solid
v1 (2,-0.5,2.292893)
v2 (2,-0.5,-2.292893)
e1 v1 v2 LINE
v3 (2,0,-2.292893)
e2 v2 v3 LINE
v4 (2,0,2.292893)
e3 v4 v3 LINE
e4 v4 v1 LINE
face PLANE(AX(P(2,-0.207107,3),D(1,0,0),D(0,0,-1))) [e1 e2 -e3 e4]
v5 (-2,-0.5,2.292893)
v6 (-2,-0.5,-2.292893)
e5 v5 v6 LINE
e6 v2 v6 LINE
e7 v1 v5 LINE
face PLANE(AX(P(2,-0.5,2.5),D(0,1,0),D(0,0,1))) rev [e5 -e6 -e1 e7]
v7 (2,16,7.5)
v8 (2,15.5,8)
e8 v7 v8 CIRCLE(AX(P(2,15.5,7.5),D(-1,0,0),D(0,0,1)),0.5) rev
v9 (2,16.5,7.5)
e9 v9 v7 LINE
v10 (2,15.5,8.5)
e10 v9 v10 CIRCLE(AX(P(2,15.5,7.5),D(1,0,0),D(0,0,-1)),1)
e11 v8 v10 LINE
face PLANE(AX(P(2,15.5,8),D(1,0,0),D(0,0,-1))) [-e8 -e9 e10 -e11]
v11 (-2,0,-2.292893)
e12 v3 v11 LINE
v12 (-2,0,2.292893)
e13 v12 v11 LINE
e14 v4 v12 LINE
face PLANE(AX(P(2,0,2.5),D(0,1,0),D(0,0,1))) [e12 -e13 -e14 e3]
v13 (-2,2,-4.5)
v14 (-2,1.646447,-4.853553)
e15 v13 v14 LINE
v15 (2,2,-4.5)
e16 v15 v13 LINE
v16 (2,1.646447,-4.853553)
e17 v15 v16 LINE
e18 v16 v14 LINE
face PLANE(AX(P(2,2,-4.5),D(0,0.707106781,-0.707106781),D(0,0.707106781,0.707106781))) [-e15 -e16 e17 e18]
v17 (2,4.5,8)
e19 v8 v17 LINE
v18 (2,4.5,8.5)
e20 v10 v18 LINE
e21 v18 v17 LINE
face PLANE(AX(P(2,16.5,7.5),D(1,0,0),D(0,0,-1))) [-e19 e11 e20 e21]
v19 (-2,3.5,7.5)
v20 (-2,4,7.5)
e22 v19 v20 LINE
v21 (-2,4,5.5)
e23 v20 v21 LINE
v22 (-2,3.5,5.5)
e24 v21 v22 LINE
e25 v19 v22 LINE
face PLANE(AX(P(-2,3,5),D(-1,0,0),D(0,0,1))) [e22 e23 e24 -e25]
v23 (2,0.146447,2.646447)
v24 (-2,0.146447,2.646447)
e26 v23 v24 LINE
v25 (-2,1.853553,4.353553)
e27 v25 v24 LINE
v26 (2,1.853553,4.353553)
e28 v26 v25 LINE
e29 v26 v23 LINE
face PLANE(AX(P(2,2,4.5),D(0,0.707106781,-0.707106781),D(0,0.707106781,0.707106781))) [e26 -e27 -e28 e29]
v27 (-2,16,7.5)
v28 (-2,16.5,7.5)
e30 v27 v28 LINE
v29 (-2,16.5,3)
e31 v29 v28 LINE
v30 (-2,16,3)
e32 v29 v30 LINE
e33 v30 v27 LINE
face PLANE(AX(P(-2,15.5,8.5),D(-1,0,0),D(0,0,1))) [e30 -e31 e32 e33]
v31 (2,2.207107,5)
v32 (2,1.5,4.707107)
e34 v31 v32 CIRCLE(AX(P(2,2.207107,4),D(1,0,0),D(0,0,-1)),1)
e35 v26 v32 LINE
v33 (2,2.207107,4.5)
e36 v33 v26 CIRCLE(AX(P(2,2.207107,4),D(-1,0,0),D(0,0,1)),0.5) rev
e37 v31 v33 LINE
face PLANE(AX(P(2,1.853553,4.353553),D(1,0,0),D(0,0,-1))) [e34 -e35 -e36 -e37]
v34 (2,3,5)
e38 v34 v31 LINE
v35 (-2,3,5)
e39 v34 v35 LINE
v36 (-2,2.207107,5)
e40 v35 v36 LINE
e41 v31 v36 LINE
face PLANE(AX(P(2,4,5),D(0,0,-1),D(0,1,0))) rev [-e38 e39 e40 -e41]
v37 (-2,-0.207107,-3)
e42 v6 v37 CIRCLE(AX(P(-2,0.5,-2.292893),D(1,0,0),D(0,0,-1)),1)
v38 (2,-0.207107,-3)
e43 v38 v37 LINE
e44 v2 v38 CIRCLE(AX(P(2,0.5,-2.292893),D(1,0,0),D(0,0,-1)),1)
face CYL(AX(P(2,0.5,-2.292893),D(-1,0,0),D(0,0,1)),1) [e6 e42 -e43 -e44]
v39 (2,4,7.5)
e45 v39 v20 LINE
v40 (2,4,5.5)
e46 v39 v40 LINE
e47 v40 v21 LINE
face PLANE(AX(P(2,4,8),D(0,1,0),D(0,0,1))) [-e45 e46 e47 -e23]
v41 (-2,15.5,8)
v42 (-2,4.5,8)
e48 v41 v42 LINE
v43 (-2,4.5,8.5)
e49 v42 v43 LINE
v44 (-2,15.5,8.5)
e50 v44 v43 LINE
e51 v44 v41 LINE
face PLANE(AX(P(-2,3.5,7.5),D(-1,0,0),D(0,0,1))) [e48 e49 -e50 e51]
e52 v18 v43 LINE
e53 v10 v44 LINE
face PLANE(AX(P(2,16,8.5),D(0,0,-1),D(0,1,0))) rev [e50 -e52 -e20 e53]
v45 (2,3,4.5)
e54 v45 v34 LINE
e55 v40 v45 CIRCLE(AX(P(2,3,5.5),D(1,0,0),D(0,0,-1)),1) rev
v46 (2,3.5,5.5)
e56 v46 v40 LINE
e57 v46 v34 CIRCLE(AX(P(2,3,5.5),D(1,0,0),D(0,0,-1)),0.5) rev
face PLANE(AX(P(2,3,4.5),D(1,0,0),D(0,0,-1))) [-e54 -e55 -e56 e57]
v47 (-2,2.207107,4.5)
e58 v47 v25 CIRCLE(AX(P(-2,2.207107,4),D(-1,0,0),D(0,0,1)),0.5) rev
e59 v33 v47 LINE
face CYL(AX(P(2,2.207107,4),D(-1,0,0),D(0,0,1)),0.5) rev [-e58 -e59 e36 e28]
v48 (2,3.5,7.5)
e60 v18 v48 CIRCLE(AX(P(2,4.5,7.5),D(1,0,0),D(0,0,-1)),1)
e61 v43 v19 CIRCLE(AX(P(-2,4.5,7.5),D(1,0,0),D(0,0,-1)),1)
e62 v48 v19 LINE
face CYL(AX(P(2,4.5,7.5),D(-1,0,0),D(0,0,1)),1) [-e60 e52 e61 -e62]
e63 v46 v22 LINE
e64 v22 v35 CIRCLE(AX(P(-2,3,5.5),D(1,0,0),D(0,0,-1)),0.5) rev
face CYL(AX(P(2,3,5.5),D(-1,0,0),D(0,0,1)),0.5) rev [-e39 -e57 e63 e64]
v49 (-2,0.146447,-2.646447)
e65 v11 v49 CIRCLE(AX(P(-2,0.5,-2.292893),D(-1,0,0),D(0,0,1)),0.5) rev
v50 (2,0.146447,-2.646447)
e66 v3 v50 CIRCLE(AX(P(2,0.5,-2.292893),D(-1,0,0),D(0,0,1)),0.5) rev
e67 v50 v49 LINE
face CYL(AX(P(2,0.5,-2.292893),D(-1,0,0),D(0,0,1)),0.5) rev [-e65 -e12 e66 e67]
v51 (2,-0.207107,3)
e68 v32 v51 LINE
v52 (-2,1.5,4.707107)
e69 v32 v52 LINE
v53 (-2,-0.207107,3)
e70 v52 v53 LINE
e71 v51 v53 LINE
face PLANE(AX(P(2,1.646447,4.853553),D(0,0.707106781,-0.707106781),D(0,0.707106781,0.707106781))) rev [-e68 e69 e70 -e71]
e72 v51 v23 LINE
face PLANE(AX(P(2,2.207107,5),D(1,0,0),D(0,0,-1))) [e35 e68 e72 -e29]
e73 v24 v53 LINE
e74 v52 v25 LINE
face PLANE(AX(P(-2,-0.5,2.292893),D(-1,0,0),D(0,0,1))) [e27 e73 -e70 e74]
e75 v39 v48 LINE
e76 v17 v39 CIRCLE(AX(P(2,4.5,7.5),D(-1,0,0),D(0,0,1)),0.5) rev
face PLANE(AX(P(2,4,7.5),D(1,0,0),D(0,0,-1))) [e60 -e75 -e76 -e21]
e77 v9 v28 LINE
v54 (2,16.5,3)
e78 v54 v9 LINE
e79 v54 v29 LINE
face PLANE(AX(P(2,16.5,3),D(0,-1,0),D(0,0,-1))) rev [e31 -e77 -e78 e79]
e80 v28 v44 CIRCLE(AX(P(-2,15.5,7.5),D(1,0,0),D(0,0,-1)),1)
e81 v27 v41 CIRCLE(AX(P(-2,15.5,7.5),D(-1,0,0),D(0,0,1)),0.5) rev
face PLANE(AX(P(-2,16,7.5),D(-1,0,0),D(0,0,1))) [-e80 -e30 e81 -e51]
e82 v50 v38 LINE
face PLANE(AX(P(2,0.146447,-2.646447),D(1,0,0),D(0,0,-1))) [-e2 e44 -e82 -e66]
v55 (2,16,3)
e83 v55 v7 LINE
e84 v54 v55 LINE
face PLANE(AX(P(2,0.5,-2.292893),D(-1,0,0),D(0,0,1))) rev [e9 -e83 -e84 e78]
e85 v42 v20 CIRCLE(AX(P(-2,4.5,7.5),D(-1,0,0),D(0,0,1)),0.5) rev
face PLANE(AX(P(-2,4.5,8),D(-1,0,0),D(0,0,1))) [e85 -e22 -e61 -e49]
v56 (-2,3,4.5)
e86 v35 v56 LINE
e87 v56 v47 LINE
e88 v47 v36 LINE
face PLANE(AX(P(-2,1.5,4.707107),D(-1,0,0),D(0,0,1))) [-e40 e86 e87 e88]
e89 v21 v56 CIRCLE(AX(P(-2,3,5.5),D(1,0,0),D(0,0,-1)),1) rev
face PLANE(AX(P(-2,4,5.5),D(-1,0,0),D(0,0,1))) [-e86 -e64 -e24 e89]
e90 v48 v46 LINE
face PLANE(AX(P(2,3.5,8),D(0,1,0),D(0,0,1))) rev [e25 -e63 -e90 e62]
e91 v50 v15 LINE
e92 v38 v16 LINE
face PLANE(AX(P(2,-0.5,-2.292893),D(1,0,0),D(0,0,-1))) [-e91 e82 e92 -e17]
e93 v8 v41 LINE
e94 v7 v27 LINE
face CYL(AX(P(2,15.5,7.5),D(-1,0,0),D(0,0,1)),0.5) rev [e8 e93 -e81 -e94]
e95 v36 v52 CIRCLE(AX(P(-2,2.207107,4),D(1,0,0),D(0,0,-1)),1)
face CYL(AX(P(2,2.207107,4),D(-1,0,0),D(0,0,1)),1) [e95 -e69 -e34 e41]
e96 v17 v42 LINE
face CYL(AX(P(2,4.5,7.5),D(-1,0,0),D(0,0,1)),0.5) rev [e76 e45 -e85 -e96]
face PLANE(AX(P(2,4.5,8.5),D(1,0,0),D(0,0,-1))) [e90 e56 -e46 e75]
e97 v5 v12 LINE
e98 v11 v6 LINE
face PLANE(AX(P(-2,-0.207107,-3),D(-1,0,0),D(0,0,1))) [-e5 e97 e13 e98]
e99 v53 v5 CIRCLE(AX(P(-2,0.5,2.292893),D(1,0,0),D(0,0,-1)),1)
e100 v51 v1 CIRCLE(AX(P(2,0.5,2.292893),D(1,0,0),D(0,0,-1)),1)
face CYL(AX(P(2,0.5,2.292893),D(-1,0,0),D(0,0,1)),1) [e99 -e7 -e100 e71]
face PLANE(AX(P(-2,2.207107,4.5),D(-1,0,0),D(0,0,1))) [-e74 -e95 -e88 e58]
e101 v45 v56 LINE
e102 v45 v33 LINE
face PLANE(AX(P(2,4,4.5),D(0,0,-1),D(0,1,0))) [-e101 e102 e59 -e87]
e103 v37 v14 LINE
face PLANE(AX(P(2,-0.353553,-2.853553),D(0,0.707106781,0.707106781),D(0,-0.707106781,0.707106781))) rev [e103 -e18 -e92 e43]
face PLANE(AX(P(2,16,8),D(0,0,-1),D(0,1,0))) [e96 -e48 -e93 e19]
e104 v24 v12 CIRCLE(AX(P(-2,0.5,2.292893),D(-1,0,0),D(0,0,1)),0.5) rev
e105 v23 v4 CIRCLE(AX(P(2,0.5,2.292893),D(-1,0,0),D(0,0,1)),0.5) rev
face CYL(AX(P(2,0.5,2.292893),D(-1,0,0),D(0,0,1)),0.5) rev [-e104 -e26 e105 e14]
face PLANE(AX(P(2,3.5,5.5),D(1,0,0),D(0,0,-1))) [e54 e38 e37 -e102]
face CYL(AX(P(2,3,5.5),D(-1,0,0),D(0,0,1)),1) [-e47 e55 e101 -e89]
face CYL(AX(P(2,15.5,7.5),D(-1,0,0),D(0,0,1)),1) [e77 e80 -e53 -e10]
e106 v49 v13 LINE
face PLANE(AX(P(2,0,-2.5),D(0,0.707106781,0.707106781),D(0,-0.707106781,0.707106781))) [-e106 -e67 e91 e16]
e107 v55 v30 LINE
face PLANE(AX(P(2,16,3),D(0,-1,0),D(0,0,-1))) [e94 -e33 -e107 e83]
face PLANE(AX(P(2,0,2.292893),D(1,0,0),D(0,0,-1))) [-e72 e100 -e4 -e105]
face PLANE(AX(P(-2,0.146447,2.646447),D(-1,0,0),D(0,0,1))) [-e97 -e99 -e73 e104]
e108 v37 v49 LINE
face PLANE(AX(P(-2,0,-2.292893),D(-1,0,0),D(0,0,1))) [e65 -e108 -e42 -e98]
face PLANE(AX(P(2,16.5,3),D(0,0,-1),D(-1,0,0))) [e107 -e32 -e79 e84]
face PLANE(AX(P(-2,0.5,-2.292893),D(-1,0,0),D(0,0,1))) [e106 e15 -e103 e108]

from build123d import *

# Parameters (mm, degrees)
BASE_FLANGE1_DEPTH = 2


# Sheet-metal steps are written as plain solids
with BuildPart() as part:
    # Sketch1 → Base-Flange1 (new, symmetric)
    with BuildSketch(Plane(origin=(0, 0, 0), x_dir=(0, 0, -1), z_dir=(1, 0, 0))):
        with BuildLine():
            Line((-3, 16), (-7.5, 16))
            ThreePointArc((-7.5, 16), (-7.853553391, 15.853553391), (-8, 15.5))
            Line((-8, 15.5), (-8, 4.5))
            ThreePointArc((-8, 4.5), (-7.853553391, 4.146446609), (-7.5, 4))
            Line((-7.5, 4), (-5.5, 4))
            ThreePointArc((-5.5, 4), (-4.792893219, 3.707106781), (-4.5, 3))
            Line((-4.5, 3), (-4.5, 2.207106781))
            ThreePointArc((-4.5, 2.207106781), (-4.461939766, 2.015765065), (-4.353553391, 1.853553391))
            Line((-4.353553391, 1.853553391), (-2.646446609, 0.146446609))
            ThreePointArc((-2.646446609, 0.146446609), (-2.484234935, 0.038060234), (-2.292893219, 0))
            Line((-2.292893219, 0), (2.292893219, 0))
            ThreePointArc((2.292893219, 0), (2.484234935, 0.038060234), (2.646446609, 0.146446609))
            Line((2.646446609, 0.146446609), (4.5, 2))
            Line((4.5, 2), (4.853553391, 1.646446609))
            Line((4.853553391, 1.646446609), (3, -0.207106781))
            ThreePointArc((3, -0.207106781), (2.675576651, -0.423879533), (2.292893219, -0.5))
            Line((2.292893219, -0.5), (-2.292893219, -0.5))
            ThreePointArc((-2.292893219, -0.5), (-2.675576651, -0.423879533), (-3, -0.207106781))
            Line((-3, -0.207106781), (-4.707106781, 1.5))
            ThreePointArc((-4.707106781, 1.5), (-4.923879533, 1.824423349), (-5, 2.207106781))
            Line((-5, 2.207106781), (-5, 3))
            ThreePointArc((-5, 3), (-5.146446609, 3.353553391), (-5.5, 3.5))
            Line((-5.5, 3.5), (-7.5, 3.5))
            ThreePointArc((-7.5, 3.5), (-8.207106781, 3.792893219), (-8.5, 4.5))
            Line((-8.5, 4.5), (-8.5, 15.5))
            ThreePointArc((-8.5, 15.5), (-8.207106781, 16.207106781), (-7.5, 16.5))
            Line((-7.5, 16.5), (-3, 16.5))
            Line((-3, 16.5), (-3, 16))
        make_face()
    extrude(amount=BASE_FLANGE1_DEPTH, both=True)


solid = part.part
